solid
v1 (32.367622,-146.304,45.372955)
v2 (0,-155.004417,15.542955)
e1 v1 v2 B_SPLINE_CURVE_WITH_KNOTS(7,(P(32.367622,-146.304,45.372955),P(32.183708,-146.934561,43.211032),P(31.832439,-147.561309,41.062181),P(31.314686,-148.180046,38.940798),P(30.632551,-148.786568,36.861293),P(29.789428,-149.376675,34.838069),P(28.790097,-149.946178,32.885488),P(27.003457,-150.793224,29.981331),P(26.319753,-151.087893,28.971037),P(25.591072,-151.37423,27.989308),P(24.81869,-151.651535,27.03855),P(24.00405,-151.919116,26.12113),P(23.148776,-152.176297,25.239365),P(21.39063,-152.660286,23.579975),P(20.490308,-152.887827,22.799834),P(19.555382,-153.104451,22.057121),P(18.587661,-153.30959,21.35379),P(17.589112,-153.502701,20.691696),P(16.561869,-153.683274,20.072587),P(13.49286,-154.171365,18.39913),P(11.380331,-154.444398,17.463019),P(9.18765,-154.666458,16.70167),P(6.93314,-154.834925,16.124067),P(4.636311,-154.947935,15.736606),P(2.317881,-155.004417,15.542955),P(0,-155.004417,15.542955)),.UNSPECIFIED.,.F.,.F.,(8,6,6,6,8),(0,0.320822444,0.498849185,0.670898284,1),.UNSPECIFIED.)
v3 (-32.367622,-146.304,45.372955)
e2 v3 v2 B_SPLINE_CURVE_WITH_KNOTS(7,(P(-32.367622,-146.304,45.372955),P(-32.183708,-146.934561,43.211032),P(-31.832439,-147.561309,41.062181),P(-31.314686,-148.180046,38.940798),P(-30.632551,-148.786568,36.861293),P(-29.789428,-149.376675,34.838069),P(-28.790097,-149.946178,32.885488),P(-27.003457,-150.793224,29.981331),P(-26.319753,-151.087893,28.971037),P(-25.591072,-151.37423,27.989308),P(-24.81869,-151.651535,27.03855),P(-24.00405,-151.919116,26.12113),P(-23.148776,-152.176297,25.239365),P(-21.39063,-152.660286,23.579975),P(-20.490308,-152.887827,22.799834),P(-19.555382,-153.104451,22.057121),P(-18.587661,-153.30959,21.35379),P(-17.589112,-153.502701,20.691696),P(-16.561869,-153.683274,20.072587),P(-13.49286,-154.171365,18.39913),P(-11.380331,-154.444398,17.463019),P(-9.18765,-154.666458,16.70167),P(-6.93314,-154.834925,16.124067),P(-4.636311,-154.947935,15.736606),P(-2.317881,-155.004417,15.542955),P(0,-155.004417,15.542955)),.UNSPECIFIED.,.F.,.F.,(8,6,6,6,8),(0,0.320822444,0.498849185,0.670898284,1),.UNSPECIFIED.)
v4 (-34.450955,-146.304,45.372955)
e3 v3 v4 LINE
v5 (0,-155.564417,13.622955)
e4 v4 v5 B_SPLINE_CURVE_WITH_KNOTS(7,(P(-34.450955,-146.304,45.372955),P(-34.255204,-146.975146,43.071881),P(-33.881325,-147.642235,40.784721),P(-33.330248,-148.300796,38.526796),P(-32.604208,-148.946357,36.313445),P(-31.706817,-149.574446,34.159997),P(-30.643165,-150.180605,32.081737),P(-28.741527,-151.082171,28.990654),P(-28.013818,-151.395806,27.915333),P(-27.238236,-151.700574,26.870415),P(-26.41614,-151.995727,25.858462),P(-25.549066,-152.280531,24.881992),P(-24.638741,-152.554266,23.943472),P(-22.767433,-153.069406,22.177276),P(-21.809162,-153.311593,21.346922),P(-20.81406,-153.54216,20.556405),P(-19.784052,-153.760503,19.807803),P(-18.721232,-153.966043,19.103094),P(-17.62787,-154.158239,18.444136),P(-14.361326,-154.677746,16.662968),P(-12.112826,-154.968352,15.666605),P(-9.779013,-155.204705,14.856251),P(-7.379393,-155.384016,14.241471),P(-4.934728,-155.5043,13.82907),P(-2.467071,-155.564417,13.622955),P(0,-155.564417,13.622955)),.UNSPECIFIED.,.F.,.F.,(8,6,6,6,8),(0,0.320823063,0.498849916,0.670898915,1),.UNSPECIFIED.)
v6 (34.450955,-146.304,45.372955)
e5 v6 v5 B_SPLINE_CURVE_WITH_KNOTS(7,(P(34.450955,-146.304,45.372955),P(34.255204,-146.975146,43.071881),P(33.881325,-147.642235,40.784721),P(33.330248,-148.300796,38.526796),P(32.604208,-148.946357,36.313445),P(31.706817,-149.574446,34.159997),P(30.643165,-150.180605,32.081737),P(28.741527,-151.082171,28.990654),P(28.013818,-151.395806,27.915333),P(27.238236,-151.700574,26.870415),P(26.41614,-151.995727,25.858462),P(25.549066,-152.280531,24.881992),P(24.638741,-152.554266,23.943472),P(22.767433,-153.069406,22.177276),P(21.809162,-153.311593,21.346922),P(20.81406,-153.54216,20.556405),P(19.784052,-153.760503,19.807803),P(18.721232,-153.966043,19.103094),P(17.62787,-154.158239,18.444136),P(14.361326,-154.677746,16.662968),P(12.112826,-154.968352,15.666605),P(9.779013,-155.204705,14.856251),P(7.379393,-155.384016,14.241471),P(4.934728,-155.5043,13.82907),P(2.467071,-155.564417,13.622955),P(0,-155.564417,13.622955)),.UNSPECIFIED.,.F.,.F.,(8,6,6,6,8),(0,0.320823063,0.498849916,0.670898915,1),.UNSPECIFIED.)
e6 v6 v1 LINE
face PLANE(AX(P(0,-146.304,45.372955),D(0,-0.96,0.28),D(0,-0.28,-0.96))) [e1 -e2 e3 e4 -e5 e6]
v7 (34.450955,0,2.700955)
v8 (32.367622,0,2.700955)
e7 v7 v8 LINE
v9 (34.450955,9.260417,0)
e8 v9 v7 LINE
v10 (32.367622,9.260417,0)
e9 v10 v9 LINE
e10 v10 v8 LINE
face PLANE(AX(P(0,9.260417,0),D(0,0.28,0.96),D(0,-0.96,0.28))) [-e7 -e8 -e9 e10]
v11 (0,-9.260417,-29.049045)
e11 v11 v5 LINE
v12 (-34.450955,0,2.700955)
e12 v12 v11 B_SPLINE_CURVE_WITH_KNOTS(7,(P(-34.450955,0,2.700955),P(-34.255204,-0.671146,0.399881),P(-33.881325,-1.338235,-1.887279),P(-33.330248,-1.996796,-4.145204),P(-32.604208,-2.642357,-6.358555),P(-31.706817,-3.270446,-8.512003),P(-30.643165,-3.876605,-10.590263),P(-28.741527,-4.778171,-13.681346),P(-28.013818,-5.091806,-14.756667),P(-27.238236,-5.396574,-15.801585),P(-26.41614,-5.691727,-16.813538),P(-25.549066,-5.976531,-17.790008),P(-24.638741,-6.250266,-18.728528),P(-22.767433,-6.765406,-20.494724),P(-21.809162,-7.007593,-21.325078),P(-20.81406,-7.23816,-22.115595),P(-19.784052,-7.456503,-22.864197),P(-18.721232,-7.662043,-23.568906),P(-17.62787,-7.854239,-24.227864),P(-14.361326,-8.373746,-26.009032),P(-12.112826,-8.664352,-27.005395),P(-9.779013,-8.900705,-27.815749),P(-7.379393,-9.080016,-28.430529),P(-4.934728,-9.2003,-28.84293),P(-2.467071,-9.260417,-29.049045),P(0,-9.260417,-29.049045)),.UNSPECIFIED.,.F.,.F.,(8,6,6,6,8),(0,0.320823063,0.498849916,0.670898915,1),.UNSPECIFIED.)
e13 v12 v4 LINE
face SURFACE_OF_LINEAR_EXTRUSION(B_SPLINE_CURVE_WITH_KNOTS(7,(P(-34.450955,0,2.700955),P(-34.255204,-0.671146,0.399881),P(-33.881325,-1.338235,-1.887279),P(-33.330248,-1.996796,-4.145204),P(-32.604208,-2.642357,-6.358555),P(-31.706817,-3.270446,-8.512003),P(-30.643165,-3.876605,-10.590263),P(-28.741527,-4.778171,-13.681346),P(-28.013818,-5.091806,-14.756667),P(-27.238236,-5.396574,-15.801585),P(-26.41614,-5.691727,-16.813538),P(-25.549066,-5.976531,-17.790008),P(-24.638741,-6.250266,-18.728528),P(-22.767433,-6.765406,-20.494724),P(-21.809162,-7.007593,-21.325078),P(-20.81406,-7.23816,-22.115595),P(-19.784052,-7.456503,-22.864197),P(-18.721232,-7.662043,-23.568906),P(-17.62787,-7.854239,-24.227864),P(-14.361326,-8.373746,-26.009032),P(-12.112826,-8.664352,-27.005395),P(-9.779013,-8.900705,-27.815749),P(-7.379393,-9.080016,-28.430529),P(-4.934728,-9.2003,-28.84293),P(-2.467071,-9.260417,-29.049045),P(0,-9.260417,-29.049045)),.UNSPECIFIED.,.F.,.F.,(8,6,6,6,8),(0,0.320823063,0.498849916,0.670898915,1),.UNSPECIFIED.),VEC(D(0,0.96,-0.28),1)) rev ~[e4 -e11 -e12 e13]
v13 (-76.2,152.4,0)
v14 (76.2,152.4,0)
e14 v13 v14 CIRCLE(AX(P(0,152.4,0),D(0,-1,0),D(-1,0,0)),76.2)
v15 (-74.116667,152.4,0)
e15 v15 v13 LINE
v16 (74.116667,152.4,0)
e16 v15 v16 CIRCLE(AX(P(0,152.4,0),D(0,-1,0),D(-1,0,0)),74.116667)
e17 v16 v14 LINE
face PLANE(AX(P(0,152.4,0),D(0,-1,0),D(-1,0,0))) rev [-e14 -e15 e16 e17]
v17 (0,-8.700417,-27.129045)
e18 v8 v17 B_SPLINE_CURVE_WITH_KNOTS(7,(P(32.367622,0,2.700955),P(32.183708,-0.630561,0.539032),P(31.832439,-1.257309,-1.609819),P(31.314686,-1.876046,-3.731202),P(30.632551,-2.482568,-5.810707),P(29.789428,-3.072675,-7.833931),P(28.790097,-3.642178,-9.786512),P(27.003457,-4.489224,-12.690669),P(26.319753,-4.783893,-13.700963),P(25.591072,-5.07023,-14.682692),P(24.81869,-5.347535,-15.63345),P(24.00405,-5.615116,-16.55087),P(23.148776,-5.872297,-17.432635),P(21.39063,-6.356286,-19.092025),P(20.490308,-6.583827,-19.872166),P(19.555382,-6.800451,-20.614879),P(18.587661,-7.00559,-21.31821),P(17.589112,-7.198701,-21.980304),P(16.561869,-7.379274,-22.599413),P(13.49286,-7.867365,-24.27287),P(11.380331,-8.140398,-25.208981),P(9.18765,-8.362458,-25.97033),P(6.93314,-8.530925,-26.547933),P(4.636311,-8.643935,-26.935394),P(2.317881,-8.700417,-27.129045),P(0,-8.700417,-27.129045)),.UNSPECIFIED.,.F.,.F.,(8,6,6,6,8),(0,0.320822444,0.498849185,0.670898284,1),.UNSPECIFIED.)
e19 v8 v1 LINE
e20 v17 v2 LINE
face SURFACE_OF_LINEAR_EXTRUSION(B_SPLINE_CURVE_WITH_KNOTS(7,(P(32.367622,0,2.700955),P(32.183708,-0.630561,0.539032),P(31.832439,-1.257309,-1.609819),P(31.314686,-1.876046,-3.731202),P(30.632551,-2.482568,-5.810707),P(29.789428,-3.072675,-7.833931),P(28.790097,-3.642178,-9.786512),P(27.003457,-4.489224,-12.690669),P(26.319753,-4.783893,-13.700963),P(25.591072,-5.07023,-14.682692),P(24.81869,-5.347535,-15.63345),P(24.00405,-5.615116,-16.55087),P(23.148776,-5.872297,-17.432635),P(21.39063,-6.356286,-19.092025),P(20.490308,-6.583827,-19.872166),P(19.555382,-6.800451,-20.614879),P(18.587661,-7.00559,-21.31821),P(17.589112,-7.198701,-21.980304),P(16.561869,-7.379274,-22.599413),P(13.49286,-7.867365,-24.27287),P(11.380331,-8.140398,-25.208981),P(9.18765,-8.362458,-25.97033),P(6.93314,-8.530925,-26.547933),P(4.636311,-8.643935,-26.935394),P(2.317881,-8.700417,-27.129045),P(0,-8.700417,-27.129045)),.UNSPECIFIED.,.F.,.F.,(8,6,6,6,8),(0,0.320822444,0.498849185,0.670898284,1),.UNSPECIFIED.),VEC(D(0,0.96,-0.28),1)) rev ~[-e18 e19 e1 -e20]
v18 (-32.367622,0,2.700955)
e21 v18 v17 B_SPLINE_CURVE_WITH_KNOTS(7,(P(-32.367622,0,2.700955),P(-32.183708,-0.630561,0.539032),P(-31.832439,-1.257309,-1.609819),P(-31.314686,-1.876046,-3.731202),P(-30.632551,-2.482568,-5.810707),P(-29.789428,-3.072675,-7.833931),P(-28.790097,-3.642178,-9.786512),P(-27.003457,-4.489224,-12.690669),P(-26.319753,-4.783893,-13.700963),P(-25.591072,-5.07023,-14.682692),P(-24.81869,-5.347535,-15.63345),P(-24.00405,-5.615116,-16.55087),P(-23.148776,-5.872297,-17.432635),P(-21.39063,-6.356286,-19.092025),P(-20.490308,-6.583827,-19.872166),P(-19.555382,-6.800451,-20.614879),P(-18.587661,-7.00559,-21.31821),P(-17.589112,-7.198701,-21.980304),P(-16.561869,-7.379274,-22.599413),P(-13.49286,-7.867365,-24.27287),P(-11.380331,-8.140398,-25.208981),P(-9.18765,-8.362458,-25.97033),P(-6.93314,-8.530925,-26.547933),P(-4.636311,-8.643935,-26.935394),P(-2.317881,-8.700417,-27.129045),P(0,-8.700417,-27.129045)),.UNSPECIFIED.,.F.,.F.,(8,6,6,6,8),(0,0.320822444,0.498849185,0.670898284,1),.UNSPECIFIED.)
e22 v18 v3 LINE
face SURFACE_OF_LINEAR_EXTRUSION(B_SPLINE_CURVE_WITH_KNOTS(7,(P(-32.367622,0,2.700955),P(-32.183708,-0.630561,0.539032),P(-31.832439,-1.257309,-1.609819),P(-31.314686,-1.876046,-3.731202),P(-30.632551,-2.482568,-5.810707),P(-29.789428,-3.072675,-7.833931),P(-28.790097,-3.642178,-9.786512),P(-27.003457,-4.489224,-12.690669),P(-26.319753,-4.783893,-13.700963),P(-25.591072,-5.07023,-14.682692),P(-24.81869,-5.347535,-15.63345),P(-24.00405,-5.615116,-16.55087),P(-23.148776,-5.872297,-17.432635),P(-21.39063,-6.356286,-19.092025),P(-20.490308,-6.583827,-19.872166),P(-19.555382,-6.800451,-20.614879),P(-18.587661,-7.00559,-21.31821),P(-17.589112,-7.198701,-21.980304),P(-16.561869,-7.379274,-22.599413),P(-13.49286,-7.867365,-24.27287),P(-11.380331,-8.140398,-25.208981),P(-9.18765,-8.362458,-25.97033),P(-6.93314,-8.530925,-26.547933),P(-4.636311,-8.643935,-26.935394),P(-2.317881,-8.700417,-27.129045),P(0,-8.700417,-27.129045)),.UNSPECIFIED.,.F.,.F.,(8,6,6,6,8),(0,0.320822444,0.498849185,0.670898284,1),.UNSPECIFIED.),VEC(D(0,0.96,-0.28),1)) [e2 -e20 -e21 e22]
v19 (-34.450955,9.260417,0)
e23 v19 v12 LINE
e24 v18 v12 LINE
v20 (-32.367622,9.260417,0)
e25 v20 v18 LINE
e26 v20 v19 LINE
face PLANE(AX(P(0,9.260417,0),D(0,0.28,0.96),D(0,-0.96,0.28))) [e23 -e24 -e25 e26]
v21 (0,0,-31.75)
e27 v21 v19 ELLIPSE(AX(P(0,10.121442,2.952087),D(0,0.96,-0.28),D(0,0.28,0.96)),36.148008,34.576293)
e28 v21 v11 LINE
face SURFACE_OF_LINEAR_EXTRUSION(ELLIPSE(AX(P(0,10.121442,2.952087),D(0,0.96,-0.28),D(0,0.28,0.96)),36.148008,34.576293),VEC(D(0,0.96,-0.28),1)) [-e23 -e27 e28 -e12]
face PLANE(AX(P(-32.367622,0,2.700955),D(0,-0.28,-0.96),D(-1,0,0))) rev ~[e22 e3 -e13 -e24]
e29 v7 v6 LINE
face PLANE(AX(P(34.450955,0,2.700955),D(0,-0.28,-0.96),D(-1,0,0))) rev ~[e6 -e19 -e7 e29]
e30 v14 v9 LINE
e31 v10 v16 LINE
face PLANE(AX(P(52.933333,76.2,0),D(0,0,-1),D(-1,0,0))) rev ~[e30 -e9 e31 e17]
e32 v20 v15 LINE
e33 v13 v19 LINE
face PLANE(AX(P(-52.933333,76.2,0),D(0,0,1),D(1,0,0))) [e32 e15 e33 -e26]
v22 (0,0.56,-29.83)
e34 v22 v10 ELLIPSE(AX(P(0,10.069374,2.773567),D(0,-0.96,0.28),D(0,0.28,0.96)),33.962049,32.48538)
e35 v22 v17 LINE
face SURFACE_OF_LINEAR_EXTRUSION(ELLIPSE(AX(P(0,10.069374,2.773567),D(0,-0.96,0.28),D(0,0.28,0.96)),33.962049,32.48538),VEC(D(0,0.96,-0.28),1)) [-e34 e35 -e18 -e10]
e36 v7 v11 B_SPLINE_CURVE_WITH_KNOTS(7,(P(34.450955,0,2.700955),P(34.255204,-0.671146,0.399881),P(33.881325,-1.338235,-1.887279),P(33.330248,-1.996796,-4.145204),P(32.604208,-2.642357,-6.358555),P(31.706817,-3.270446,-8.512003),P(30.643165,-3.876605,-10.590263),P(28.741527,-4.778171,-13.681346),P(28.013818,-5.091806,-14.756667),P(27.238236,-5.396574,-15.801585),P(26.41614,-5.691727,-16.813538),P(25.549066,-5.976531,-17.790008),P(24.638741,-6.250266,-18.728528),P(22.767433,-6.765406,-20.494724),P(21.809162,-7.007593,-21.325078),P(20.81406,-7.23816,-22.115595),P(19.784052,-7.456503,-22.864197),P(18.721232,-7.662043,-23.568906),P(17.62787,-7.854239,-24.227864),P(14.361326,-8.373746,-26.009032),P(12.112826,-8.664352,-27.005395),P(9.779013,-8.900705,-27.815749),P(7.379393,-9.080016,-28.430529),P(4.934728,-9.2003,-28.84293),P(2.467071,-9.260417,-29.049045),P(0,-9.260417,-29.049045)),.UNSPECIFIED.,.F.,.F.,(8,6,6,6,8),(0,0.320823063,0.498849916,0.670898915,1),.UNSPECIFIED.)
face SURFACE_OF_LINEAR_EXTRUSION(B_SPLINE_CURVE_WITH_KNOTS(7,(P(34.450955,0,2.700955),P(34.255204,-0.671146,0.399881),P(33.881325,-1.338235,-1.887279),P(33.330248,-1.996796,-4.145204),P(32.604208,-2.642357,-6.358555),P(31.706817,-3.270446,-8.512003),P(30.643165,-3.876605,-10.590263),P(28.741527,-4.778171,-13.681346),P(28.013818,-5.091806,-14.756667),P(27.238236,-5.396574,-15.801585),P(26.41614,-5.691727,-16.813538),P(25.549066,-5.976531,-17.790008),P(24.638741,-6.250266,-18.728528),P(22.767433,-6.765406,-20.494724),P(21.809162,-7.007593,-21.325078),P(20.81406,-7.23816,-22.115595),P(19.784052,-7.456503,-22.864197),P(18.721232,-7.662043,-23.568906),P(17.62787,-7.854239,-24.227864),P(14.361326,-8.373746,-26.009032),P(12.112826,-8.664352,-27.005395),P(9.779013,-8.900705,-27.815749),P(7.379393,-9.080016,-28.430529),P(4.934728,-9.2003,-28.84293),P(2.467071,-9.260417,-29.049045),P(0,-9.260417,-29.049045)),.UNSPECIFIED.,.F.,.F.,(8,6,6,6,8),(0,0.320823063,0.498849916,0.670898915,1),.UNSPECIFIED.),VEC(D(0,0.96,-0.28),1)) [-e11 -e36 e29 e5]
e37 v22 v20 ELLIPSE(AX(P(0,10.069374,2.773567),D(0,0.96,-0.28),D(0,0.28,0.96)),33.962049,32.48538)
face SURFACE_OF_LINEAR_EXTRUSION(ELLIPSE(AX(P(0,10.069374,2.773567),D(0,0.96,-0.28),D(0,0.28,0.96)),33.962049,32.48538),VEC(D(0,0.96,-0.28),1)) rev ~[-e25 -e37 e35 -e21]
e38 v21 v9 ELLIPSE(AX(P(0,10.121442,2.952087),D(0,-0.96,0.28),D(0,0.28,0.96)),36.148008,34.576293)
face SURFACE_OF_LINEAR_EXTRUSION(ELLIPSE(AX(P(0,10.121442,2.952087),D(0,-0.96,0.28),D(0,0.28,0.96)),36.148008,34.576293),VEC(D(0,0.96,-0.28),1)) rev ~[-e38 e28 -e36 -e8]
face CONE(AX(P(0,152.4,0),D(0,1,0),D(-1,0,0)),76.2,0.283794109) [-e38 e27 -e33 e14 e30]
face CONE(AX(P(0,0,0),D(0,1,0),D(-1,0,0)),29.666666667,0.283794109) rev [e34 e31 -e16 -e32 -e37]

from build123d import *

# Parameters (mm, degrees)
F1_ANGLE      = 180
F3_DEPTH      = 44.6
F3_DEPTH_BACK = 39.8
F4_DEPTH      = 25
F5_DEPTH      = 25
F6_DEPTH      = 152.4


with BuildPart() as f1:
    # F0 (on Top) → F1 (revolve)
    with BuildSketch(Plane.XY):
        Polygon((-31.75, 0), (-29.6666666667, 0), (-74.1166666667, 152.4), (-76.2, 152.4), align=None)
    revolve(axis=Axis((0, 76.2, 0), (0, -1, 0)), revolution_arc=F1_ANGLE)

    # F2 (on Right) → F3 (join, two sides)
    with BuildSketch(Plane.YZ) as f3_sk:
        Polygon((-9.2604166667, -29.0490451389), (0, -31.75), (9.2604166667, 0), (0, 2.7009548611), align=None)
    extrude(amount=F3_DEPTH)
    extrude(f3_sk.sketch, amount=-F3_DEPTH_BACK)

    # F4 (cut): faces of the model
    f4_faces = [f1.faces().sort_by_distance(p)[0] for p in [
        (33.8924298462, 3.5692640267, -19.5125233371),
        (-30.9009295453, 3.1872250967, -20.8223710971),
    ]]
    extrude(f4_faces, amount=-F4_DEPTH, mode=Mode.SUBTRACT)

    # F5 (cut): a face of the model
    f5_faces = [f1.faces().sort_by_distance(p)[0] for p in [
        (0, 5.5929259121, -12.5742540156),
    ]]
    extrude(f5_faces, amount=-F5_DEPTH, mode=Mode.SUBTRACT)

    # F6 (add): a face of the model
    f6_faces = [f1.faces().sort_by_distance(p)[0] for p in [
        (33.4092881944, -0.2139993496, 1.9672428053),
    ]]
    extrude(f6_faces, amount=F6_DEPTH)


solid = f1.part
